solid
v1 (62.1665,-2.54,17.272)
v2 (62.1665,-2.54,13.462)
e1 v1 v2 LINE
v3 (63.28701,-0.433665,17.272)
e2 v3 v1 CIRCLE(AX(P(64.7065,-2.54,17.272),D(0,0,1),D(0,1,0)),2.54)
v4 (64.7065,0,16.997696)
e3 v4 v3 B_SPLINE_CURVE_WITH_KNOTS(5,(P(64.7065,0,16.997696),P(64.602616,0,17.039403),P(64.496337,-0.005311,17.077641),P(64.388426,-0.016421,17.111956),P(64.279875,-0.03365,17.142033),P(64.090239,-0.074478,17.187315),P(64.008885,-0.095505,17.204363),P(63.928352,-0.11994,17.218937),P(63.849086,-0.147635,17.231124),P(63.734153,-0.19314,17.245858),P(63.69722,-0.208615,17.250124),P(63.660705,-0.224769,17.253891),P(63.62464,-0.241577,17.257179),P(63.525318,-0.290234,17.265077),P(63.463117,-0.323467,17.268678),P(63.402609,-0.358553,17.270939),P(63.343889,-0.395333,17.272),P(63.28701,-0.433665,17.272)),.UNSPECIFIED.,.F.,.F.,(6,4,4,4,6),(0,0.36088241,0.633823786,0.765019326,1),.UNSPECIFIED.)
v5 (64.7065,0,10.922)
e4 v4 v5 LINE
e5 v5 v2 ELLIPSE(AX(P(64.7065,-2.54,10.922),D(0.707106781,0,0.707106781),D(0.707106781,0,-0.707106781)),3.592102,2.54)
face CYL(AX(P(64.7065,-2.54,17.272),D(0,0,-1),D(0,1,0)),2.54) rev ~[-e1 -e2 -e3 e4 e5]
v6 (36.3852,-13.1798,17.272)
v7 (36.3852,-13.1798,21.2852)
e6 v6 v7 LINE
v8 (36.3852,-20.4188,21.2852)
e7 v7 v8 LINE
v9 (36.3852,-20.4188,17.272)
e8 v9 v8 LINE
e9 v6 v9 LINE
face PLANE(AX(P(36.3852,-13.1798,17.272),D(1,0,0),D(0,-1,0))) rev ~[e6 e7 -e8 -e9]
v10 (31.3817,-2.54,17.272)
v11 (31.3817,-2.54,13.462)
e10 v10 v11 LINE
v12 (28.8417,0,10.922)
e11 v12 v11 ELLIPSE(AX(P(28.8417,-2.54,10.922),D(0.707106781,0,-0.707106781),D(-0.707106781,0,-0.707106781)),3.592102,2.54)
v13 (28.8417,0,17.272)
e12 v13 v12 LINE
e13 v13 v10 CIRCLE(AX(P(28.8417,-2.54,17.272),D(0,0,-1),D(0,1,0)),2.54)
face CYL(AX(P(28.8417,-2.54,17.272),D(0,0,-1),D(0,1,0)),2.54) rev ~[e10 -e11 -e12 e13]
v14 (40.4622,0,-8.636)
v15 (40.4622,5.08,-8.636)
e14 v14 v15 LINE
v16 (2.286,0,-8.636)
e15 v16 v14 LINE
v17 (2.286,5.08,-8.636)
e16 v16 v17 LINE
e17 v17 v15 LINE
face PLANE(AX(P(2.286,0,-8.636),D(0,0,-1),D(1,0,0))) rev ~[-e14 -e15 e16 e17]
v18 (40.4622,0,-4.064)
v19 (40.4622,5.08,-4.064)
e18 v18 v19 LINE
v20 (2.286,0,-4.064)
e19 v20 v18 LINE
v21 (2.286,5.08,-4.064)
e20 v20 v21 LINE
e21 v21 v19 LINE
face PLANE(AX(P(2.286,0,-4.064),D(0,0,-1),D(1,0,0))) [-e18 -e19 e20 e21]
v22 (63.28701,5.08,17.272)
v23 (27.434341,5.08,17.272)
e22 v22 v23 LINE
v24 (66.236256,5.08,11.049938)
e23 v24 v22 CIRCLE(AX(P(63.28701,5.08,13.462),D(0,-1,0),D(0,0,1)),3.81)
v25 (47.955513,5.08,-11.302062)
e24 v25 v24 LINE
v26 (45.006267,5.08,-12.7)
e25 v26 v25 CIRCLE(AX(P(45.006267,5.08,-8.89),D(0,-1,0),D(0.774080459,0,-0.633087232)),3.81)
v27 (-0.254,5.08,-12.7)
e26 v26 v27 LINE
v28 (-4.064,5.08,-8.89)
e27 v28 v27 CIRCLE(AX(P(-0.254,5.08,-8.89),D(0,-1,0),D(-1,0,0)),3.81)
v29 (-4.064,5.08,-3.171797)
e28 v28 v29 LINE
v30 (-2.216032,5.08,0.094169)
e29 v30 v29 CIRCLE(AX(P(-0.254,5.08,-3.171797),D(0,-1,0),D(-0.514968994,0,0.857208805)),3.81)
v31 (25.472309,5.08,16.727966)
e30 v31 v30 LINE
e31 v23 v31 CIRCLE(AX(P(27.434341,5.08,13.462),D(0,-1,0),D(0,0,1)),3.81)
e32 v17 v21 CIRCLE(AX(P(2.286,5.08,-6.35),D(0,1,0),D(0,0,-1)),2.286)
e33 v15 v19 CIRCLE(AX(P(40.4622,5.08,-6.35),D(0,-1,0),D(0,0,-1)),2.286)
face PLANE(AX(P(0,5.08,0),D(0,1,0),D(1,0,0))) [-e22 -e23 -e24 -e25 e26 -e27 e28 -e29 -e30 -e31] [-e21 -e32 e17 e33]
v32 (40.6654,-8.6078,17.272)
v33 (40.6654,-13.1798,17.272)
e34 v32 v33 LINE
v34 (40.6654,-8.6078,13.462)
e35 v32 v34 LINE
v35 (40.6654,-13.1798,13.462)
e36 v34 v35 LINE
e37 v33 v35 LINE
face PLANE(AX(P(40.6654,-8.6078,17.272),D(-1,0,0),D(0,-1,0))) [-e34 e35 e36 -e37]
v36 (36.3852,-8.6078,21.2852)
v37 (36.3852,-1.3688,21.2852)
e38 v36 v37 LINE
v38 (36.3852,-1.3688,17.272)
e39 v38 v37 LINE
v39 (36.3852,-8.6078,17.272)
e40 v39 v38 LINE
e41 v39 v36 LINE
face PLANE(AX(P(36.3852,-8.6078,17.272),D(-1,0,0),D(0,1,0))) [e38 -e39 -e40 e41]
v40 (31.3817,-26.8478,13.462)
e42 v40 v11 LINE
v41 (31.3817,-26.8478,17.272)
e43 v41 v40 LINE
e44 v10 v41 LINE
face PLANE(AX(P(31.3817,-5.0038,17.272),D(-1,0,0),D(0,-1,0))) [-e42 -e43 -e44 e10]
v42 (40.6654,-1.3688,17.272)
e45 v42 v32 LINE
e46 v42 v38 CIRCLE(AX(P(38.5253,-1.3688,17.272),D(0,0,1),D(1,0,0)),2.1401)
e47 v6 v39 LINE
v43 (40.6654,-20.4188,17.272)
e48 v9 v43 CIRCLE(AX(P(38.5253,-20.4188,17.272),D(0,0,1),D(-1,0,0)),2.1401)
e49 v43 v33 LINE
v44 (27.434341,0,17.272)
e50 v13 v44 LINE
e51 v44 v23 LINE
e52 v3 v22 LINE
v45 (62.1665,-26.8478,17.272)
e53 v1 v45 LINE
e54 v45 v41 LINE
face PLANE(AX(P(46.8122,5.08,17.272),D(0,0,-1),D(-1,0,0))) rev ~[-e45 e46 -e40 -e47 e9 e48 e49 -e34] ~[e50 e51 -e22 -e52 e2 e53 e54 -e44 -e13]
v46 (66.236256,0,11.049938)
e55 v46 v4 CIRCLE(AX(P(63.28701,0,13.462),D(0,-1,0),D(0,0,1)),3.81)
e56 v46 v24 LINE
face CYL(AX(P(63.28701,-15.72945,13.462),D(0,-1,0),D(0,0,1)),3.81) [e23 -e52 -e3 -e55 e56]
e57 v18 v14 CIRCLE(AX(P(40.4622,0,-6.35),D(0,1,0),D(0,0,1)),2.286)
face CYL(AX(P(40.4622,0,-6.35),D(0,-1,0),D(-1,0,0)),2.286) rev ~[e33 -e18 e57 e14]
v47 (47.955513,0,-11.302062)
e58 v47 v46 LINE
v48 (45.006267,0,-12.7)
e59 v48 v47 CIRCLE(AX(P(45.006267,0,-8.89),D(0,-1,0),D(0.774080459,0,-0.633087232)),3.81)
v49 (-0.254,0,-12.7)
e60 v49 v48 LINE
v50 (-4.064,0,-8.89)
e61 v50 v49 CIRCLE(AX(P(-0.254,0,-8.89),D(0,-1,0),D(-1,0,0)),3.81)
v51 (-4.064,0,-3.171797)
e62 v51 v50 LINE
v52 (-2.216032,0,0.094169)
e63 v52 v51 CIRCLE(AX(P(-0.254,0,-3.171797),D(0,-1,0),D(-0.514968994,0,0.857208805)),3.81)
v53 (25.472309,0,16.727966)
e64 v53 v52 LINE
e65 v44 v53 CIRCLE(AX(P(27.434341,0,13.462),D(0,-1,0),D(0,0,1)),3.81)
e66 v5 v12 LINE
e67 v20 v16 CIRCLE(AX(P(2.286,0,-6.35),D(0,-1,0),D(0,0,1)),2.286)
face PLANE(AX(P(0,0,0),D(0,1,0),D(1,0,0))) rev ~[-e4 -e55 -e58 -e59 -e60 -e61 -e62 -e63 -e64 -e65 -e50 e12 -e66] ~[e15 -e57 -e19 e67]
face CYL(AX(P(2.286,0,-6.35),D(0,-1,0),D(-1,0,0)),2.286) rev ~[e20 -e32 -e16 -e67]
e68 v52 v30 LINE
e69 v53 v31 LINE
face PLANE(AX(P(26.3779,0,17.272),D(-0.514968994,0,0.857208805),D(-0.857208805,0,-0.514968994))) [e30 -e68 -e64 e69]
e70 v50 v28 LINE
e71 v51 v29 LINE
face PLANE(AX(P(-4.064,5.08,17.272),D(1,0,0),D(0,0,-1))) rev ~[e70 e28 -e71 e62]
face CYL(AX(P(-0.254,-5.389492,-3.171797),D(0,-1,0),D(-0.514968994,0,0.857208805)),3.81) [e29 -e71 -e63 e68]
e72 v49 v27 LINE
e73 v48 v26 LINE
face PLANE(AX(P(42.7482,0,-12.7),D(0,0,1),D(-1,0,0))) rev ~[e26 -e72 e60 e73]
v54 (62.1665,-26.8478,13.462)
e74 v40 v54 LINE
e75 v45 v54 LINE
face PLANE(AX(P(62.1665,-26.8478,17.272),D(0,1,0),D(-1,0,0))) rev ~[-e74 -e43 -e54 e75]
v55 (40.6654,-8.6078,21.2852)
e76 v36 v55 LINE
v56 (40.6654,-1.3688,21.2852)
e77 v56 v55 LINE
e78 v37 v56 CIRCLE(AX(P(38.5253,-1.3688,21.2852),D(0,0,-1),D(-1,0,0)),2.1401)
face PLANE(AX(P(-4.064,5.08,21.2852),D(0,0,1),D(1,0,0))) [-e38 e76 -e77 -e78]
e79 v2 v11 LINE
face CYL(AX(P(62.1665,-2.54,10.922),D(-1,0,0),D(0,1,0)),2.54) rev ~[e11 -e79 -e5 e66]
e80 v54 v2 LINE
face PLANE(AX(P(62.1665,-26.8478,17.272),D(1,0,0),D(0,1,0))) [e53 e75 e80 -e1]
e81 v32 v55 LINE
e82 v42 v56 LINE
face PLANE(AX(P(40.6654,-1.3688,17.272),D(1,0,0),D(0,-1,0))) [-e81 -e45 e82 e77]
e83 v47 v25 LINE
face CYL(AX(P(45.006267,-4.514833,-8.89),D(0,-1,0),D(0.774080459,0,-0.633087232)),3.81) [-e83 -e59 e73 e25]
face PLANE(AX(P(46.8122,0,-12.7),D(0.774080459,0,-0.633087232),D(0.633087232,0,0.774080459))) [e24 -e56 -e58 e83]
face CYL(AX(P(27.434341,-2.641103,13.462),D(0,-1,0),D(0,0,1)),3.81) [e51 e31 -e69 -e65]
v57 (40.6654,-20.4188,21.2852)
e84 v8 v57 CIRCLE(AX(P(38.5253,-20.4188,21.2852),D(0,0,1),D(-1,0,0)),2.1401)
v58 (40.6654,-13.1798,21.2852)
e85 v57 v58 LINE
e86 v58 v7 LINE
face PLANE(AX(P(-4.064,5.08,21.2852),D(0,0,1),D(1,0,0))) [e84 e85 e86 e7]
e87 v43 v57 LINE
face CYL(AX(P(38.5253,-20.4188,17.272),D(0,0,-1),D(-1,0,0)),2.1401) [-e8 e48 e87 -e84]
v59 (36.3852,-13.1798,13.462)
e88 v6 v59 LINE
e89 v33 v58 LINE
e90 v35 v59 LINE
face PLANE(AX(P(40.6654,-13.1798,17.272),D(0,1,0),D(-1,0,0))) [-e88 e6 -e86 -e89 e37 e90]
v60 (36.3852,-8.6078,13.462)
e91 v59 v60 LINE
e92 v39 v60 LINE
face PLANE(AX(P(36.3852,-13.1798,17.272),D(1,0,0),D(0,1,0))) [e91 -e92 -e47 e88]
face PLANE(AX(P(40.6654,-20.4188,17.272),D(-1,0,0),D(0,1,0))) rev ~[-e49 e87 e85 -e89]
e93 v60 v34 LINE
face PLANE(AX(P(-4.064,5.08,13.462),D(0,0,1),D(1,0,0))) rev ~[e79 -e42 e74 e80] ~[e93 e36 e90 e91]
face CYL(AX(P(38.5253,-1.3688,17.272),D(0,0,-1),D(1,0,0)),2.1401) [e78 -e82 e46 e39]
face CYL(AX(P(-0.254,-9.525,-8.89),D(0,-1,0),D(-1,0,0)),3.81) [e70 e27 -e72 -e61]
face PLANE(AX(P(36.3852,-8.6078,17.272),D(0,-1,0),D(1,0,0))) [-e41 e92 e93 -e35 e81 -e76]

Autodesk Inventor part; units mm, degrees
ref_plane "YZ Plane" through (0, 0, 0) normal (1, 0, 0) x (0, 1, 0)
ref_plane "XZ Plane" through (0, 0, 0) normal (0, 1, 0) x (-1, 0, 0)
ref_plane "XY Plane" through (0, 0, 0) normal (0, 0, 1) x (1, 0, 0)
sketch "Sketch1" plane through (0, 0, 0) normal (0, 1, 0) x (-1, 0, 0)
  line L0 (0, 0) -> (-42.7482, 0)
  line L1 (-42.7482, 0) -> (-42.7482, -12.7)
  line L2 (-42.7482, -12.7) -> (0, -12.7)
  line L3 (0, -12.7) -> (0, 0)
  line L4 (0, -6.35) -> (-42.7482, -6.35)
  circle A0 centre (-2.286, -6.35) radius 2.286
  circle A1 centre (-40.4622, -6.35) radius 2.286
  line L5 (0, 0) -> (4.064, 0)
  line L6 (4.064, 0) -> (4.064, -12.7)
  line L7 (4.064, -12.7) -> (0, -12.7)
  line L8 (0, -12.7) -> (0, 0)
  line L9 (-42.7482, 0) -> (-46.8122, 0)
  line L10 (-46.8122, 0) -> (-46.8122, -12.7)
  line L11 (-46.8122, -12.7) -> (-42.7482, -12.7)
  line L12 (-42.7482, -12.7) -> (-42.7482, 0)
  line L13 (-2.286, -4.064) -> (-40.4622, -4.064)
  line L14 (-2.286, -8.636) -> (-40.4622, -8.636)
  dimension "d0" = 12.7
  dimension "d1" = 42.7482
  dimension "d2" = 4.572
  dimension "d3" = 4.572
  dimension "d4" = 2.286
  dimension "d5" = 2.286
  dimension "d6" = 4.064
  dimension "d7" = 4.064
extrude "Extrusion1" add sketch "Sketch1" along normal blind 5.08 contours L3 A0 L13 A1 L1 L0 | L5 L6 L7 L3 | L1 L11 L10 L9 | L3 L2 L1 A1 L14 A0
sketch "Sketch2" plane through (0, 5.08, 0) normal (0, 1, 0) x (1, 0, 0)
  line L0 (-4.064, 12.7) -> (-4.064, 0) projected
  line L1 (-4.064, 0) -> (46.8122, 0)
  line L2 (46.8122, 0) -> (46.8122, -17.272)
  line L3 (46.8122, -17.272) -> (-4.064, -17.272)
  line L4 (-4.064, -17.272) -> (-4.064, 0)
  point P0 (0, 0)
  point P1 (46.8122, -8.636)
  dimension "d10" = 50.8762
  dimension "d11" = 17.272
extrude "Extrusion2" add sketch "Sketch2" against normal blind 5.08
sketch "Sketch9" plane through (-4.064, 5.08, 17.272) normal (0, 0, 1) x (1, 0, 0)
  line L0 (66.2305, -31.9278) -> (66.2305, -10.0838)
  line L1 (66.2305, -31.9278) -> (35.4457, -31.9278)
  line L2 (35.4457, -10.0838) -> (35.4457, -31.9278)
  line L3 (44.7294, -25.4988) -> (44.7294, -18.2598)
  arc A0 (40.4492, -25.4988) -> (44.7294, -25.4988) centre (42.5893, -25.4988) ccw
  line L4 (40.4492, -18.2598) -> (40.4492, -25.4988)
  line L5 (44.7294, -13.6878) -> (44.7294, -18.2598)
  line L6 (40.4492, -18.2598) -> (40.4492, -13.6878)
  line L7 (40.4492, -13.6878) -> (40.4492, -6.4488)
  arc A1 (44.7294, -6.4488) -> (40.4492, -6.4488) centre (42.5893, -6.4488) ccw
  line L8 (44.7294, -6.4488) -> (44.7294, -13.6878)
  line L9 (40.4492, -13.6878) -> (44.7294, -13.6878)
  line L10 (44.7294, -18.2598) -> (40.4492, -18.2598)
  arc A2 (71.2343, -5.08) -> (66.2305, -10.0838) centre (71.2343, -10.0838) ccw
  arc A3 (35.4457, -10.0838) -> (30.4419, -5.08) centre (30.4419, -10.0838) ccw
  line L11 (40.8305, -31.9278) -> (66.2305, -31.9278)
  line L12 (29.464, -5.08) -> (71.2343, -5.08)
  line L13 (35.4457, -10.0838) -> (35.4457, -5.08)
  line L14 (66.2305, -10.0838) -> (66.2305, -5.08)
  point P0 (40.9442, -5.08)
  point P1 (30.4419, -5.08)
  point P2 (44.2344, -5.08)
  dimension "d43" = 25.4
extrude "Extrusion7" add sketch "Sketch9" against normal blind 3.81 contours L1 L2 L13 L12 A1 L7 L6 L4 A0 L3 L5 L8 L14 L0 | L12 A1 | A1 L8 L9 L7 L12 | L3 A0 L4 L10
extrude "Extrusion8" add sketch "Sketch9" along normal blind 4.0132 contours L12 A1 | A1 L8 L9 L7 L12 | L3 A0 L4 L10
sketch "Sketch10" plane through (46.8122, 0, 17.272) normal (0, 1, 0) x (1, 0, 0)
  line L0 (15.3543, 5.08) -> (20.3581, 5.08) projected
  line L1 (0, 0) -> (0, 29.972) projected
  line L2 (0, 29.972) -> (20.3581, 5.08)
  line L3 (-15.4305, 0) -> (-20.4343, 0) projected
  line L4 (-20.4343, 0) -> (-50.8762, 18.288)
  line L5 (-50.8762, 29.972) -> (-50.8762, 0) projected
  line L6 (0, 29.972) -> (-0.0381, 3.81)
  line L7 (15.3543, 3.81) -> (-15.4305, 3.81) projected
  line L8 (0, 0) -> (20.3581, 0)
  line L9 (20.3581, 0) -> (20.3581, 5.08)
  line L10 (20.3581, 5.08) -> (0, 5.08)
  line L11 (0, 5.08) -> (0, 0)
  line L12 (-50.8762, 29.972) -> (-50.8762, 0) projected
  line L13 (-50.8762, 18.288) -> (-50.8762, 0)
  line L14 (-50.8762, 0) -> (-20.4343, 0)
  point P0 (-46.8122, 17.272)
extrude "Extrusion9" add sketch "Sketch10" along normal blind 5.08 contours L10 L1 L2 L0 | L0 L9 L8 L1 L10
extrude "Extrusion10" cut sketch "Sketch10" along normal blind 5.08 contours L14 L5 L4
fillet "Fillet4" radius 3.81 6 edges at (46.8122, 2.54, -12.7) (-4.064, 2.54, -12.7) (-4.064, 2.54, -1.016) (26.3779, 2.54, 17.272) (67.1703, 2.54, 12.192) (67.1703, 2.54, 17.272)
fillet "Fillet5" radius 2.54 3 edges at (62.1665, 0, 15.367) (46.7741, 0, 13.462) (31.3817, 0, 15.367)
properties part number "Limit Switch Mount"
